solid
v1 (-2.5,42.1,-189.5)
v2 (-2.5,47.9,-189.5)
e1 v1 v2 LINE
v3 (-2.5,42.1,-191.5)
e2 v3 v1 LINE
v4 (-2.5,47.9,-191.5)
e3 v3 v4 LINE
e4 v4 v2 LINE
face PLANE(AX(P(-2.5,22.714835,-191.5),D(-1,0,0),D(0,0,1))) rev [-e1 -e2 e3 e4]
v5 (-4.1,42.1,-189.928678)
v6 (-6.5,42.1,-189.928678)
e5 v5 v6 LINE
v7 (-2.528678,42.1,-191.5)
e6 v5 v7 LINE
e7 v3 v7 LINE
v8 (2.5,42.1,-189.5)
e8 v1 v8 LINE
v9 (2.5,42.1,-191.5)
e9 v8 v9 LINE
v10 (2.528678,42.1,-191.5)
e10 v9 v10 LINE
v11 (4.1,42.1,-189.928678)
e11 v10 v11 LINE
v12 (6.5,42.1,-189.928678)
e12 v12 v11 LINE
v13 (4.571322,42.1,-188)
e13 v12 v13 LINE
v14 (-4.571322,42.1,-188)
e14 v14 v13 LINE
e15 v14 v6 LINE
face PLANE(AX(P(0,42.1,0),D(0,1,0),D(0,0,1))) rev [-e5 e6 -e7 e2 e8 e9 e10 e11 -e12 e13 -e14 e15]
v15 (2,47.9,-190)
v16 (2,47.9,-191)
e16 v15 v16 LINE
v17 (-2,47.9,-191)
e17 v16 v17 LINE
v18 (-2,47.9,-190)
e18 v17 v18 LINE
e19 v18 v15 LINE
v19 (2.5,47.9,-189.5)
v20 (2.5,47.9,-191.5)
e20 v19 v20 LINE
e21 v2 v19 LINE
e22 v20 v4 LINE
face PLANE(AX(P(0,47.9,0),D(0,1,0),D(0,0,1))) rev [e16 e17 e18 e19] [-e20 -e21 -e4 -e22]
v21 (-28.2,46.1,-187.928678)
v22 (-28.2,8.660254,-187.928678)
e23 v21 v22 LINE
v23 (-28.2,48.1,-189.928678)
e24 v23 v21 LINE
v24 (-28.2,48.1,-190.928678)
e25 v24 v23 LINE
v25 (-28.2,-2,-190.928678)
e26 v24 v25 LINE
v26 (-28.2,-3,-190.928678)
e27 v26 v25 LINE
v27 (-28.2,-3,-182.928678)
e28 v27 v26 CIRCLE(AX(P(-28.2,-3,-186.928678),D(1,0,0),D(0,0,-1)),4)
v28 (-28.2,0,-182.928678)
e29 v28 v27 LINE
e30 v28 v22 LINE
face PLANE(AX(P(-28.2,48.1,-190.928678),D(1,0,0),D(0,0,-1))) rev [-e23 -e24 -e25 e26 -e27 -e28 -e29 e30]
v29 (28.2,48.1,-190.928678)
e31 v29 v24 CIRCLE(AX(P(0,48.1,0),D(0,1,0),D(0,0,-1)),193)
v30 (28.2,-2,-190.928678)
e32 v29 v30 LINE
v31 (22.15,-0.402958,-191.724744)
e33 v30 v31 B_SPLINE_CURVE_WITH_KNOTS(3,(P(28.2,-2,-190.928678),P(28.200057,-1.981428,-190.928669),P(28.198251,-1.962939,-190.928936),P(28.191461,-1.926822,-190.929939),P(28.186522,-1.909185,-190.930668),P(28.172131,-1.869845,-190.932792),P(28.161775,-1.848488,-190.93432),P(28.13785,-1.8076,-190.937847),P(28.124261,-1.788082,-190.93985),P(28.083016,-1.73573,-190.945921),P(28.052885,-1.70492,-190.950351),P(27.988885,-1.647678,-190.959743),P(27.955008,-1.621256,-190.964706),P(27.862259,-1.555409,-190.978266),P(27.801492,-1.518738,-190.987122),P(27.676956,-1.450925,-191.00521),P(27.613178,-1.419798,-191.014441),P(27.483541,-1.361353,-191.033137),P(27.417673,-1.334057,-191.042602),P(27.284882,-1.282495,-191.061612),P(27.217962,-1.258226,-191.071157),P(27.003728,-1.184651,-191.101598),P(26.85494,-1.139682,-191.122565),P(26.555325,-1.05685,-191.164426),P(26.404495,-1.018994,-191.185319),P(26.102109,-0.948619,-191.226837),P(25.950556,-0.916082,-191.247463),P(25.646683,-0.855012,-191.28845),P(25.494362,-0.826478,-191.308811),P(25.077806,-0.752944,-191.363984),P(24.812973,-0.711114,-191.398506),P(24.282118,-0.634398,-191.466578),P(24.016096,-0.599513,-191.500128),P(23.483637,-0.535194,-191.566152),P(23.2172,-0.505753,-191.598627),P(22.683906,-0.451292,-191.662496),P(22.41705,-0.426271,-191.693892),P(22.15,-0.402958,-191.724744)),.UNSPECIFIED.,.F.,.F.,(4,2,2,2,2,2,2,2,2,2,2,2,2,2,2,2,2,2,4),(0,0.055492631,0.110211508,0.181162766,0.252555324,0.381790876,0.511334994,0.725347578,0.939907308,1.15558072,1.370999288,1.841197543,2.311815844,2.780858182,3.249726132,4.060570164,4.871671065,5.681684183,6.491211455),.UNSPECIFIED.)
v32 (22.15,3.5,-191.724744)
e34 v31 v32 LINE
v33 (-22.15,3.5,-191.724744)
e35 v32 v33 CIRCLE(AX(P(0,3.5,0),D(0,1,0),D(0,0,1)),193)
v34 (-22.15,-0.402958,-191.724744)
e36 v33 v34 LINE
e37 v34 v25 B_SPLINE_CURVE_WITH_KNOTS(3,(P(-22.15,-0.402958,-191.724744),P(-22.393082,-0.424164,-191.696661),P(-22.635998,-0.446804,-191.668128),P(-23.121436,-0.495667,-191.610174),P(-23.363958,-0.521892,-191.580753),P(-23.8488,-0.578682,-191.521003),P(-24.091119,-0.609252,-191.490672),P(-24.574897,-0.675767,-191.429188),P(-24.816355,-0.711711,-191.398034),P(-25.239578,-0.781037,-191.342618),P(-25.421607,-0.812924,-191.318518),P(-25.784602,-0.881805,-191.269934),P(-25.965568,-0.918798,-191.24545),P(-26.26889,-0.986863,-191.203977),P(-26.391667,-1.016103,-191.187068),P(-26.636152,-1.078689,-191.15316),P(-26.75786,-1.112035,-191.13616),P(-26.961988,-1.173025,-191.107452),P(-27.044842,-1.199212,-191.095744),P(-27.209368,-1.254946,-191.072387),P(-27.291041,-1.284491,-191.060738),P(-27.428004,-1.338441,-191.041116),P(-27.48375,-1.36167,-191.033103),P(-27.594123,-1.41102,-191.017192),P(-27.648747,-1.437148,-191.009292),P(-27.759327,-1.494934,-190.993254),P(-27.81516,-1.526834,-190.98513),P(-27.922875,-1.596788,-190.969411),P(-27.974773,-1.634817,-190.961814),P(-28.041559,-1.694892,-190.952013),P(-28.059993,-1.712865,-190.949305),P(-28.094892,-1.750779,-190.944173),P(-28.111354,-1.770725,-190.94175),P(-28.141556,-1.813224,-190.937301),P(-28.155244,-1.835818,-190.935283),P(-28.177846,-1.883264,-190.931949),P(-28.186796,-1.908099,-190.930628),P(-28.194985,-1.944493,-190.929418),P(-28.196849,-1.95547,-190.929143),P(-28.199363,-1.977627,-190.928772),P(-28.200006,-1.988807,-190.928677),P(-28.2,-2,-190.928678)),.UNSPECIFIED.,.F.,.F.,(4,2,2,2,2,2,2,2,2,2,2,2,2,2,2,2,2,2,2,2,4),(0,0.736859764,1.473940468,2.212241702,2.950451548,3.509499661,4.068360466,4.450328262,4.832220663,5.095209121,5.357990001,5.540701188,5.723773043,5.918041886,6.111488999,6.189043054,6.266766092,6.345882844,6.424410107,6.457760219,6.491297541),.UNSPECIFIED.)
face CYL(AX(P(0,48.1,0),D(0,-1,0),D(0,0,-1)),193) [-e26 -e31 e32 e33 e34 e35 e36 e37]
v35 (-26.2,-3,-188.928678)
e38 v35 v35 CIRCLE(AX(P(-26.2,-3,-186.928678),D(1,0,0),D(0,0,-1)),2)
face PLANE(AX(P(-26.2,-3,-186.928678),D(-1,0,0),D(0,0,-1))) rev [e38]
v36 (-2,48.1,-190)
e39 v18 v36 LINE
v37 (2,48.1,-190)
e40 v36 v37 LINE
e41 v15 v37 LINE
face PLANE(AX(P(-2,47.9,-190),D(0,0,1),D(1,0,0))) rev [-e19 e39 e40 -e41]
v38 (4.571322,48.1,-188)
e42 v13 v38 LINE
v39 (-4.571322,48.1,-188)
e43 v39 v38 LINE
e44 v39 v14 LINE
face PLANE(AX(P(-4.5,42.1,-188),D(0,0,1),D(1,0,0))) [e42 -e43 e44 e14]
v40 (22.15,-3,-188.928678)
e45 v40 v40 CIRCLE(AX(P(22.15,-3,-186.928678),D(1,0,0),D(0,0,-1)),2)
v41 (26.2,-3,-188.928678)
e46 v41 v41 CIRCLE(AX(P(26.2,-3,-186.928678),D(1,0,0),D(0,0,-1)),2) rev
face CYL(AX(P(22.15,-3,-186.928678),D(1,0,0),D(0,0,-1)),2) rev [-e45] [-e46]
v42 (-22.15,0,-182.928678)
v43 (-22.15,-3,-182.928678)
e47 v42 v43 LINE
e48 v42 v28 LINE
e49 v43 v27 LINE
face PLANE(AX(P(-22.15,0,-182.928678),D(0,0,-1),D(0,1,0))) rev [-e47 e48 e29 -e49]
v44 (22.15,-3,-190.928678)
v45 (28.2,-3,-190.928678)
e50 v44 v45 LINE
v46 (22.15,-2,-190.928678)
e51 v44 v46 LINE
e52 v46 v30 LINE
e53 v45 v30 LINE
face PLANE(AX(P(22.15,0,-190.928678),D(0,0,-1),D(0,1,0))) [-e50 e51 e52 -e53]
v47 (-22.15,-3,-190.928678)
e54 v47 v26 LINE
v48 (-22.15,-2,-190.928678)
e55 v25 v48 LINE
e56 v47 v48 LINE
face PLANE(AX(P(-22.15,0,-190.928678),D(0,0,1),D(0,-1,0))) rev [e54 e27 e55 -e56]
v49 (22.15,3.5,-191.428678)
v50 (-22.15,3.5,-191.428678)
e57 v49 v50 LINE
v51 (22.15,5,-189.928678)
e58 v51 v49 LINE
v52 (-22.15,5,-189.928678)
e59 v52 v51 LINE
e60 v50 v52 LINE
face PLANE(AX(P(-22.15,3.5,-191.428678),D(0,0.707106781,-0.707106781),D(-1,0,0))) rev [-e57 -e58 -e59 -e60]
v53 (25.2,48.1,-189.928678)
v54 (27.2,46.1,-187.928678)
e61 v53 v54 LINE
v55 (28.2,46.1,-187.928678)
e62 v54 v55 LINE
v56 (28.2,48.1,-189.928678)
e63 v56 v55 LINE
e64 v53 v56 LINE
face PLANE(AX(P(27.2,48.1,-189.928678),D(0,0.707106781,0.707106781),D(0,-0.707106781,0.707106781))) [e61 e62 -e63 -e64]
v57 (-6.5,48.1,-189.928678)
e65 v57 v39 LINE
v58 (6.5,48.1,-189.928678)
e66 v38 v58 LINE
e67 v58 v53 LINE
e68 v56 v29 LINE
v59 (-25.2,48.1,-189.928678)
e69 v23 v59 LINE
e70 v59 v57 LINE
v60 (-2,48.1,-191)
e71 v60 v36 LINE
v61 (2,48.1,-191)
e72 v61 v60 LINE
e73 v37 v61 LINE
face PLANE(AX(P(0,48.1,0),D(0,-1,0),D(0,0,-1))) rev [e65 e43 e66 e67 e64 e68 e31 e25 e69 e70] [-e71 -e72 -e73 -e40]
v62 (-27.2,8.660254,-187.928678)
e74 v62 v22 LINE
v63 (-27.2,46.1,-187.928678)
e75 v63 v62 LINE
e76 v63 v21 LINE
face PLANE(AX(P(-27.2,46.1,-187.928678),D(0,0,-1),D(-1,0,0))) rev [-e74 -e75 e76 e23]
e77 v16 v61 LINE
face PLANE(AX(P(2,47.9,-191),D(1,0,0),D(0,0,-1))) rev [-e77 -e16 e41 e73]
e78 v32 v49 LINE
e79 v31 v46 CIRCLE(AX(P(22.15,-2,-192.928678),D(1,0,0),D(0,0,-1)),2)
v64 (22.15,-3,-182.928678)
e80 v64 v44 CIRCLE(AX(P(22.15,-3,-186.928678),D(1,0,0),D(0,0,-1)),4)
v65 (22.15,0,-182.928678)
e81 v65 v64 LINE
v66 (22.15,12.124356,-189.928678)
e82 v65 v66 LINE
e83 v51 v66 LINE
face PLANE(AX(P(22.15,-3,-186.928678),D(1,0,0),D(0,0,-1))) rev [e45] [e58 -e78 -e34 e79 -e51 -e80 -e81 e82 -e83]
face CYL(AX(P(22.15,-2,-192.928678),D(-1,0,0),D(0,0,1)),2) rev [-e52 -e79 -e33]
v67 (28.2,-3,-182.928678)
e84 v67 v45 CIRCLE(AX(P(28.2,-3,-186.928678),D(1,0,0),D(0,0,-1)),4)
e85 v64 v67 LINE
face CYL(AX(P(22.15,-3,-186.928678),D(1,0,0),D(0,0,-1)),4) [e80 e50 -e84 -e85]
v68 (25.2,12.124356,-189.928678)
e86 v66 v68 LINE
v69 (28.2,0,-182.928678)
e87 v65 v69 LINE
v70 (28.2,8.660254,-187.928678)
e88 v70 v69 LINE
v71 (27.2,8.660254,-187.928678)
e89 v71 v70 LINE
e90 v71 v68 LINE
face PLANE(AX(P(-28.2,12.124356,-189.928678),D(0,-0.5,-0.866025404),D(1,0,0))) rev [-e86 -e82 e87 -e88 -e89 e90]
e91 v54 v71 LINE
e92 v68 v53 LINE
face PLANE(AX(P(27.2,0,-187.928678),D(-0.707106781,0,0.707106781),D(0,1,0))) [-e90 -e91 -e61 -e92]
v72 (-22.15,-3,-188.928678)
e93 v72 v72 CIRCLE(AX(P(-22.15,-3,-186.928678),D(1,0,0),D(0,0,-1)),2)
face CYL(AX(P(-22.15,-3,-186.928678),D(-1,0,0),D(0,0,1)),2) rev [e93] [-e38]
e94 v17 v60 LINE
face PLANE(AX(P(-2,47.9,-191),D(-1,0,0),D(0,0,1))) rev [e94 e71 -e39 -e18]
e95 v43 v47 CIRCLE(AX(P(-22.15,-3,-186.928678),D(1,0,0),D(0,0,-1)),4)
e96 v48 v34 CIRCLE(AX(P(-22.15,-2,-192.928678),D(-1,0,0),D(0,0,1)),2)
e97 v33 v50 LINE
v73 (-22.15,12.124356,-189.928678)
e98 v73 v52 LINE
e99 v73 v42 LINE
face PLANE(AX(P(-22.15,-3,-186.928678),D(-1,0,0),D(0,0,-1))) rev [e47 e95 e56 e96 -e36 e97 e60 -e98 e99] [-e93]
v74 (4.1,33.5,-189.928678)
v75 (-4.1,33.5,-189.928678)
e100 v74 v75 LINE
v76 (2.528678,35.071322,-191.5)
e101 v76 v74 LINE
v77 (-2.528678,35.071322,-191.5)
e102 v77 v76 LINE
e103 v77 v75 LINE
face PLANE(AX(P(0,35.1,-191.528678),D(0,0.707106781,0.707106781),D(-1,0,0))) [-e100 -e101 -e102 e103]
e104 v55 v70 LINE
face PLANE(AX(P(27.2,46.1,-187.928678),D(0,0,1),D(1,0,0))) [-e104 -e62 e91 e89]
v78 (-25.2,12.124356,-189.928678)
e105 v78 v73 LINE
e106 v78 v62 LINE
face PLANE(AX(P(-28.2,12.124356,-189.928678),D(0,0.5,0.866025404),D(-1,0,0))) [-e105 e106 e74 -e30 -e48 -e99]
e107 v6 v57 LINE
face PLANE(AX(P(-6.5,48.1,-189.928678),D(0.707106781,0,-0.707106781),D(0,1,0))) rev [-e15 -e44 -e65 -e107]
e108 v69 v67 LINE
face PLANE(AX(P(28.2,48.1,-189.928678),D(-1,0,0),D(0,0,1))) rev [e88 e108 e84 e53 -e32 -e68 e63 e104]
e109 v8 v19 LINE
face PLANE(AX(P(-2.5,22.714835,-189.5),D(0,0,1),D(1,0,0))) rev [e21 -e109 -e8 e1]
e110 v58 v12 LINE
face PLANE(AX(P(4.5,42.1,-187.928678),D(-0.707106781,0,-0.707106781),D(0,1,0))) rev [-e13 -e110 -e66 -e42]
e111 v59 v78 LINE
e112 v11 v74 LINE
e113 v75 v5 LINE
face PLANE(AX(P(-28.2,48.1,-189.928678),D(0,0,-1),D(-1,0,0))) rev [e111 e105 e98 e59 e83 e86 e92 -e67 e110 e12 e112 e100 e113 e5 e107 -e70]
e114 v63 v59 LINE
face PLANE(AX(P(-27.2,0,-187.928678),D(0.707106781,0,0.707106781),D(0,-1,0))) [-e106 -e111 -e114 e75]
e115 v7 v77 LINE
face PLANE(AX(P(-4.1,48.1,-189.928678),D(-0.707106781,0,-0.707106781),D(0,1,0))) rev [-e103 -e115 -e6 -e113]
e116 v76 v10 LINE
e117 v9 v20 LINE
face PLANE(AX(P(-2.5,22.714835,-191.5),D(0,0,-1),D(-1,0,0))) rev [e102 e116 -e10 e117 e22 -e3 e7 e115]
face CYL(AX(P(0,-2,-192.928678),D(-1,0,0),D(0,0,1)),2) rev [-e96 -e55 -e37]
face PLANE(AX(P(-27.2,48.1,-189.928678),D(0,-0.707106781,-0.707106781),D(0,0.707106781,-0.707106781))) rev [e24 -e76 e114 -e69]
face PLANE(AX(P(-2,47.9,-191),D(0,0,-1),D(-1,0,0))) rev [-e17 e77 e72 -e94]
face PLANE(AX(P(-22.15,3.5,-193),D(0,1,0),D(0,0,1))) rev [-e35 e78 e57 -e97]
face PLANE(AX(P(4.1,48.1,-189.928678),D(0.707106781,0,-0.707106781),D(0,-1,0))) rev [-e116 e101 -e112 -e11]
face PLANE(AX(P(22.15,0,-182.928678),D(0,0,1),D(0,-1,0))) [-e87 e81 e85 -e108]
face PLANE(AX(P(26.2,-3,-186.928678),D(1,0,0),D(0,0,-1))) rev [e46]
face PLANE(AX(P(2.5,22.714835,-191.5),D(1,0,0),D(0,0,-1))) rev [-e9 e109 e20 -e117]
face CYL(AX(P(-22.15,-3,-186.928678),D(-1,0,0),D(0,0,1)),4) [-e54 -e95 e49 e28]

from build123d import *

# Parameters (mm, degrees)
BOSS_EXTRUDE1_DEPTH       = 48.1
SKETCH2_R                 = 2
BOSS_EXTRUDE2_DEPTH       = 6.05
CHAMFER1_SIZE2            = 7
CHAMFER1_SIZE             = 12.124355653
CHAMFER1_OF_MIRROR1_SIZE2 = 7
CHAMFER1_OF_MIRROR1_SIZE  = 12.124355653
BOSS_EXTRUDE3_DEPTH       = 1
CHAMFER2_SIZE             = 2
SKETCH4_W                 = 44.3
SKETCH4_H                 = 3.5
LITTLE_BIT_OF_SPACE_DEPTH = 57.194750645
CHAMFER3_SIZE             = 1.5
FILLET1_R                 = 2
SKETCH5_W                 = 9
SKETCH5_H                 = 1.928677783
BOSS_EXTRUDE4_DEPTH       = 6
SKETCH6_W                 = 5
SKETCH6_H                 = 2
CUT_EXTRUDE2_DEPTH        = 13
SKETCH7_W                 = 5
SKETCH7_H                 = 2
SKETCH7_W_2               = 4
SKETCH7_H_2               = 1
BOSS_EXTRUDE5_DEPTH       = 0.2
BOSS_EXTRUDE7_DEPTH       = 1.5
CHAMFER6_SIZE             = 1.5
CHAMFER7_SIZE             = 1.6
CHAMFER8_SIZE             = 2
SKETCH10_W                = 15.27160506
SKETCH10_H                = 9.874411304
CUT_EXTRUDE3_DEPTH        = 203.6826338
SKETCH11_R                = 2
BOSS_EXTRUDE8_DEPTH       = 2


# Read off the part's stored shape, not the designer's step: Boss-Extrude1
# Some blends are built 0.0001 mm under size
with BuildPart() as part:
    # Boss-Extrude1 outline → Boss-Extrude1 (new body)
    with BuildSketch(Plane(origin=(0, 0, 0), x_dir=(1, 0, 0), z_dir=(0, 1, 0))):
        with BuildLine():
            ThreePointArc((28.2, 190.928677783), (0, 193), (-28.2, 190.928677783))
            Line((-28.2, 190.928677783), (-28.2, 189.928677783))
            Line((-28.2, 189.928677783), (28.2, 189.928677783))
            Line((28.2, 189.928677783), (28.2, 190.928677783))
        make_face()
    extrude(amount=BOSS_EXTRUDE1_DEPTH)

    # Sketch2 → Boss-Extrude2 (add)
    with BuildSketch(Plane(origin=(28.2, 0, 0), x_dir=(0, 0, -1), z_dir=(1, 0, 0))):
        with BuildLine():
            Line((190.928677783, 0), (182.928677783, 0))
            Line((182.928677783, 0), (182.928677783, -3))
            ThreePointArc((182.928677783, -3), (186.928677783, -7), (190.928677783, -3))
            Line((190.928677783, -3), (190.928677783, 0))
        make_face()
        with Locations((186.928677783, -3)):
            Circle(SKETCH2_R, mode=Mode.SUBTRACT)
    boss_extrude2 = extrude(amount=-BOSS_EXTRUDE2_DEPTH)

    # Chamfer1
    chamfer1_edges = [part.edges().sort_by_distance(p)[0] for p in [
        (25.175, 0, -189.928677783),
    ]]
    chamfer1_side = [part.faces().sort_by_distance(p)[0] for p in [
        (25.175, 0.14, -189.928677783),
    ]]
    chamfer(chamfer1_edges, length=CHAMFER1_SIZE - 0.0001, length2=CHAMFER1_SIZE2 - 0.0001, reference=chamfer1_side[0])  # a hair under: the kernel refuses the full size

    # Mirror1: Boss-Extrude2 across plane
    add(boss_extrude2.mirror(Plane(origin=(0, 0, 0), x_dir=(0, 0, 1), z_dir=(1, 0, 0))))

    # Chamfer1 of Mirror1
    chamfer1_of_mirror1_edges = [part.edges().sort_by_distance(p)[0] for p in [
        (-25.175, 0, -189.928677783),
    ]]
    chamfer1_of_mirror1_side = [part.faces().sort_by_distance(p)[0] for p in [
        (-25.175, 0.14, -189.928677783),
    ]]
    chamfer(chamfer1_of_mirror1_edges, length=CHAMFER1_OF_MIRROR1_SIZE - 0.0001, length2=CHAMFER1_OF_MIRROR1_SIZE2 - 0.0001, reference=chamfer1_of_mirror1_side[0])  # a hair under: the kernel refuses the full size

    # Sketch3 → Boss-Extrude3 (add)
    with BuildSketch(Plane(origin=(28.2, 0, 0), x_dir=(0, 0, -1), z_dir=(1, 0, 0))):
        Polygon((190.928677783, 48.1), (190.928677783, 8.660254038), (187.928677783, 8.660254038), (187.928677783, 46.1), (189.928677783, 48.1), align=None)
    boss_extrude3 = extrude(amount=-BOSS_EXTRUDE3_DEPTH)

    # Mirror2: Boss-Extrude3 across plane
    add(boss_extrude3.mirror(Plane(origin=(0, 0, 0), x_dir=(0, 0, 1), z_dir=(1, 0, 0))))

    # Chamfer2
    chamfer2_edges = [part.edges().sort_by_distance(p)[0] for p in [
        (-27.2, 30.112127827, -189.928677783),
        (27.2, 30.112127827, -189.928677783),
    ]]
    chamfer(chamfer2_edges, length=CHAMFER2_SIZE - 0.0001)  # a hair under: the kernel refuses the full size

    # Sketch4 → Little bit of space (cut, through all)
    with BuildSketch(Plane.XY.offset(-189.928677783)):
        with Locations((0, 1.75)):
            Rectangle(SKETCH4_W, SKETCH4_H)
    extrude(amount=-LITTLE_BIT_OF_SPACE_DEPTH, mode=Mode.SUBTRACT)

    # Chamfer3
    chamfer3_edges = [part.edges().sort_by_distance(p)[0] for p in [
        (0, 3.5, -189.928677783),
    ]]
    chamfer(chamfer3_edges, length=CHAMFER3_SIZE)

    # Fillet1
    # the kernel refuses this fillet: 2 mm, written as the material it adds along each edge
    with BuildSketch(Plane(origin=(-33.2, 0, -190.928677783), x_dir=(0, 0, -1), z_dir=(1, 0, 0))) as fillet1_piece_1_section:
        with BuildLine():
            CenterArc((FILLET1_R, -FILLET1_R), FILLET1_R, 90, 90)
            Line((0, -FILLET1_R), (0, 0))
            Line((0, 0), (FILLET1_R, 0))
        make_face()
    fillet1_piece_1 = extrude(amount=11.05, mode=Mode.PRIVATE)
    fillet1_piece_1 = fillet1_piece_1 & Plane(origin=(0, -0.599281995, -9e-09), x_dir=(0.14611398964376573, 0, -0.9892677605332044), z_dir=(0, -1, 0)) * Cylinder(192.999999991, 31, mode=Mode.PRIVATE)
    add(fillet1_piece_1)
    with BuildSketch(Plane(origin=(33.2, 0, -190.928677783), x_dir=(0, 0, -1), z_dir=(-1, 0, 0))) as fillet1_piece_2_section:
        with BuildLine():
            CenterArc((FILLET1_R, FILLET1_R), FILLET1_R, 180, 90)
            Line((0, FILLET1_R), (0, 0))
            Line((0, 0), (FILLET1_R, 0))
        make_face()
    fillet1_piece_2 = extrude(amount=11.05, mode=Mode.PRIVATE)
    fillet1_piece_2 = fillet1_piece_2 & Plane(origin=(0, -0.599283958, -9e-09), x_dir=(0.14611398964376573, 0, -0.9892677605332044), z_dir=(0, -1, 0)) * Cylinder(192.999999991, 31, mode=Mode.PRIVATE)
    add(fillet1_piece_2)

    # Sketch5 → Boss-Extrude4 (add)
    with BuildSketch(Plane(origin=(0, 48.1, 0), x_dir=(1, 0, 0), z_dir=(0, 1, 0))):
        with Locations((0, 188.964338892)):
            Rectangle(SKETCH5_W, SKETCH5_H)
    extrude(amount=-BOSS_EXTRUDE4_DEPTH)

    # Sketch6 → Cut-Extrude2 (cut)
    with BuildSketch(Plane(origin=(0, 48.1, 0), x_dir=(1, 0, 0), z_dir=(0, 1, 0))):
        with Locations((0, 190.5)):
            Rectangle(SKETCH6_W, SKETCH6_H)
    extrude(amount=-CUT_EXTRUDE2_DEPTH, mode=Mode.SUBTRACT)

    # Sketch7 → Boss-Extrude5 (add)
    with BuildSketch(Plane(origin=(0, 48.1, 0), x_dir=(1, 0, 0), z_dir=(0, 1, 0))):
        with Locations((0, 190.5)):
            Rectangle(SKETCH7_W, SKETCH7_H)
        with Locations((0, 190.5)):
            Rectangle(SKETCH7_W_2, SKETCH7_H_2, mode=Mode.SUBTRACT)
    extrude(amount=-BOSS_EXTRUDE5_DEPTH)

    # Sketch9 → Boss-Extrude7 (add)
    with BuildSketch(Plane(origin=(0, 48.1, 0), x_dir=(1, 0, 0), z_dir=(0, 1, 0))):
        with BuildLine():
            Line((-2.5, 192.983807611), (-2.5, 191.383807611))
            Line((-2.5, 191.383807611), (2.5, 191.383807611))
            Line((2.5, 191.383807611), (2.5, 192.983807611))
            ThreePointArc((2.5, 192.983807611), (0, 193), (-2.5, 192.983807611))
        make_face()
    extrude(amount=BOSS_EXTRUDE7_DEPTH)

    # Chamfer6
    # the kernel refuses this chamfer: 1.5 mm, written as the material it adds along each edge
    with BuildSketch(Plane(origin=(-2.5, 48.1, -196.841332093), x_dir=(-0.9996219169112968, -0.02749587661058678, 0), z_dir=(0, 0, 1))) as chamfer6_piece_1_section:
        Polygon((CHAMFER6_SIZE * 0.999621916911, -CHAMFER6_SIZE * 0.0274958766106), (-CHAMFER6_SIZE * 0.0274958766106, -CHAMFER6_SIZE * 0.999621916911), (0, 0), align=None)
    chamfer6_piece_1 = extrude(amount=5.457524482, mode=Mode.PRIVATE)
    chamfer6_piece_1 = chamfer6_piece_1 & Plane(origin=(0, 48.593713067, -9e-09), x_dir=(0.14611398964402453, 0, -0.9892677605331662), z_dir=(0, -1, 0)) * Cylinder(192.999999991, 17, mode=Mode.PRIVATE)
    chamfer6_piece_1 = split(chamfer6_piece_1, bisect_by=Plane(origin=(-2.994165451, 49.6, -192.180106011), z_dir=(0, -1, 0)), keep=Keep.TOP, mode=Mode.PRIVATE)
    add(chamfer6_piece_1)
    with BuildSketch(Plane(origin=(2.5, 48.1, -191.383807611), x_dir=(0.9996219169112968, -0.02749587661058678, 0), z_dir=(0, 0, -1))) as chamfer6_piece_2_section:
        Polygon((CHAMFER6_SIZE * 0.999621916911, -CHAMFER6_SIZE * 0.0274958766106), (-CHAMFER6_SIZE * 0.0274958766106, -CHAMFER6_SIZE * 0.999621916911), (0, 0), align=None)
    chamfer6_piece_2 = extrude(amount=5.457524482, mode=Mode.PRIVATE)
    chamfer6_piece_2 = chamfer6_piece_2 & Plane(origin=(0, 48.593713067, -9e-09), x_dir=(0.14611398964402453, 0, -0.9892677605331662), z_dir=(0, -1, 0)) * Cylinder(192.999999991, 17, mode=Mode.PRIVATE)
    chamfer6_piece_2 = split(chamfer6_piece_2, bisect_by=Plane(origin=(2.994165451, 49.6, -192.180106011), z_dir=(0, -1, 0)), keep=Keep.TOP, mode=Mode.PRIVATE)
    add(chamfer6_piece_2)

    # Chamfer7
    # the kernel refuses this chamfer: 1.6 mm, written as the material it takes off along each edge
    with BuildSketch(Plane(origin=(-2.5, 42.1, -189.928677783), x_dir=(0.027495876610586577, 0, -0.9996219169112966), z_dir=(0, -1, 0))) as chamfer7_piece_1_section:
        Polygon((CHAMFER7_SIZE * 0.999621916911, -CHAMFER7_SIZE * 0.0274958766106), (-CHAMFER7_SIZE * 0.0274958766106, -CHAMFER7_SIZE * 0.999621916911), (0, 0), align=None)
    chamfer7_piece_1 = extrude(amount=7, mode=Mode.PRIVATE)
    chamfer7_piece_1 = split(chamfer7_piece_1, bisect_by=Plane(origin=(-3.029634844, 38.6, -191.5), z_dir=(0, 0, 1)), keep=Keep.TOP, mode=Mode.PRIVATE)
    add(chamfer7_piece_1, mode=Mode.SUBTRACT)
    with BuildSketch(Plane(origin=(2.5, 35.1, -189.928677783), x_dir=(-0.027495876610586306, 0, -0.9996219169112966), z_dir=(0, 1, 0))) as chamfer7_piece_2_section:
        Polygon((CHAMFER7_SIZE * 0.999621916911, -CHAMFER7_SIZE * 0.0274958766106), (-CHAMFER7_SIZE * 0.0274958766106, -CHAMFER7_SIZE * 0.999621916911), (0, 0), align=None)
    chamfer7_piece_2 = extrude(amount=7, mode=Mode.PRIVATE)
    chamfer7_piece_2 = split(chamfer7_piece_2, bisect_by=Plane(origin=(3.029634844, 38.6, -191.5), z_dir=(0, 0, 1)), keep=Keep.TOP, mode=Mode.PRIVATE)
    add(chamfer7_piece_2, mode=Mode.SUBTRACT)
    with BuildSketch(Plane(origin=(2.5, 35.1, -189.928677783), x_dir=(0, 0.027495876610587656, -0.9996219169112966), z_dir=(-1, 0, 0))) as chamfer7_piece_3_section:
        Polygon((CHAMFER7_SIZE * 0.999621916911, CHAMFER7_SIZE * 0.0274958766106), (-CHAMFER7_SIZE * 0.0274958766106, CHAMFER7_SIZE * 0.999621916911), (0, 0), align=None)
    chamfer7_piece_3 = extrude(amount=5, mode=Mode.PRIVATE)
    chamfer7_piece_3 = split(chamfer7_piece_3, bisect_by=Plane(origin=(0, 34.570365156, -191.5), z_dir=(0, 0, 1)), keep=Keep.TOP, mode=Mode.PRIVATE)
    add(chamfer7_piece_3, mode=Mode.SUBTRACT)
    with BuildSketch(Plane(origin=(-2.5, 42.1, -189.928677783), x_dir=(0.027495876610586577, 0, -0.9996219169112966), z_dir=(0, -1, 0))) as chamfer7_piece_4a_section:
        Polygon((CHAMFER7_SIZE * 0.999621916911, -CHAMFER7_SIZE * 0.0274958766106), (-CHAMFER7_SIZE * 0.0274958766106, -CHAMFER7_SIZE * 0.999621916911), (0, 0), align=None)
    chamfer7_piece_4a = extrude(amount=11.114692781, mode=Mode.PRIVATE)
    chamfer7_piece_4a = split(chamfer7_piece_4a, bisect_by=Plane(origin=(-3.029634844, 33.04265361, -191.5), z_dir=(0, 0, 1)), keep=Keep.TOP, mode=Mode.PRIVATE)
    chamfer7_piece_4a = split(chamfer7_piece_4a, bisect_by=Plane(origin=(-3.029634844, 35.1, -190.452614737), z_dir=(0, -1, 0)), keep=Keep.TOP, mode=Mode.PRIVATE)
    with BuildSketch(Plane(origin=(2.5, 35.1, -189.928677783), x_dir=(0, 0.027495876610587656, -0.9996219169112966), z_dir=(-1, 0, 0))) as chamfer7_piece_4b_section:
        Polygon((CHAMFER7_SIZE * 0.999621916911, CHAMFER7_SIZE * 0.0274958766106), (-CHAMFER7_SIZE * 0.0274958766106, CHAMFER7_SIZE * 0.999621916911), (0, 0), align=None)
    chamfer7_piece_4b = extrude(amount=9.114692781, mode=Mode.PRIVATE)
    chamfer7_piece_4b = split(chamfer7_piece_4b, bisect_by=Plane(origin=(-2.5, 34.570365156, -190.452614737), z_dir=(-1, 0, 0)), keep=Keep.TOP, mode=Mode.PRIVATE)
    chamfer7_piece_4b = split(chamfer7_piece_4b, bisect_by=Plane(origin=(-4.55734639, 34.570365156, -191.5), z_dir=(0, 0, 1)), keep=Keep.TOP, mode=Mode.PRIVATE)
    chamfer7_piece_4 = chamfer7_piece_4a & chamfer7_piece_4b
    add(chamfer7_piece_4, mode=Mode.SUBTRACT)
    with BuildSketch(Plane(origin=(6.614692781, 35.1, -189.928677783), x_dir=(0, 0.027495876610587656, -0.9996219169112966), z_dir=(-1, 0, 0))) as chamfer7_piece_5a_section:
        Polygon((CHAMFER7_SIZE * 0.999621916911, CHAMFER7_SIZE * 0.0274958766106), (-CHAMFER7_SIZE * 0.0274958766106, CHAMFER7_SIZE * 0.999621916911), (0, 0), align=None)
    chamfer7_piece_5a = extrude(amount=9.114692781, mode=Mode.PRIVATE)
    chamfer7_piece_5a = split(chamfer7_piece_5a, bisect_by=Plane(origin=(2.5, 34.570365156, -190.452614737), z_dir=(1, 0, 0)), keep=Keep.TOP, mode=Mode.PRIVATE)
    chamfer7_piece_5a = split(chamfer7_piece_5a, bisect_by=Plane(origin=(4.55734639, 34.570365156, -191.5), z_dir=(0, 0, 1)), keep=Keep.TOP, mode=Mode.PRIVATE)
    with BuildSketch(Plane(origin=(2.5, 30.985307219, -189.928677783), x_dir=(-0.027495876610586577, 0, -0.9996219169112966), z_dir=(0, 1, 0))) as chamfer7_piece_5b_section:
        Polygon((CHAMFER7_SIZE * 0.999621916911, -CHAMFER7_SIZE * 0.0274958766106), (-CHAMFER7_SIZE * 0.0274958766106, -CHAMFER7_SIZE * 0.999621916911), (0, 0), align=None)
    chamfer7_piece_5b = extrude(amount=11.114692781, mode=Mode.PRIVATE)
    chamfer7_piece_5b = split(chamfer7_piece_5b, bisect_by=Plane(origin=(3.029634844, 35.1, -190.452614737), z_dir=(0, -1, 0)), keep=Keep.TOP, mode=Mode.PRIVATE)
    chamfer7_piece_5b = split(chamfer7_piece_5b, bisect_by=Plane(origin=(3.029634844, 33.04265361, -191.5), z_dir=(0, 0, 1)), keep=Keep.TOP, mode=Mode.PRIVATE)
    chamfer7_piece_5 = chamfer7_piece_5a & chamfer7_piece_5b
    add(chamfer7_piece_5, mode=Mode.SUBTRACT)

    # Chamfer8
    # the kernel refuses this chamfer: 2 mm, written as the material it adds along each edge
    with BuildSketch(Plane(origin=(-4.5, 48.1, -189.928677783), x_dir=(-0.9996219169125519, 0, -0.027495876564955297), z_dir=(0, -1, 0))) as chamfer8_piece_1_section:
        Polygon((CHAMFER8_SIZE * 0.999621916911, -CHAMFER8_SIZE * 0.0274958766112), (-CHAMFER8_SIZE * 0.027495876565, -CHAMFER8_SIZE * 0.999621916913), (0, 0), align=None)
    chamfer8_piece_1 = extrude(amount=6, mode=Mode.PRIVATE)
    chamfer8_piece_1 = split(chamfer8_piece_1, bisect_by=Plane(origin=(-5.163599307, 45.1, -188), z_dir=(0, 0, -1)), keep=Keep.TOP, mode=Mode.PRIVATE)
    add(chamfer8_piece_1)
    with BuildSketch(Plane(origin=(4.5, 48.1, -189.928677783), x_dir=(0.9996219169125516, 0, -0.02749587656495524), z_dir=(0, -1, 0))) as chamfer8_piece_2_section:
        Polygon((CHAMFER8_SIZE * 0.999621916911, CHAMFER8_SIZE * 0.0274958766112), (-CHAMFER8_SIZE * 0.027495876565, CHAMFER8_SIZE * 0.999621916913), (0, 0), align=None)
    chamfer8_piece_2 = extrude(amount=6, mode=Mode.PRIVATE)
    chamfer8_piece_2 = split(chamfer8_piece_2, bisect_by=Plane(origin=(5.163599307, 45.1, -188), z_dir=(0, 0, -1)), keep=Keep.TOP, mode=Mode.PRIVATE)
    add(chamfer8_piece_2)

    # Sketch10 → Cut-Extrude3 (cut, through all)
    with BuildSketch(Plane(origin=(0, 48.1, 0), x_dir=(1, 0, 0), z_dir=(0, 1, 0))):
        with Locations((-0.319497541, 192.732882239)):
            Rectangle(SKETCH10_W, SKETCH10_H)
    extrude(amount=CUT_EXTRUDE3_DEPTH, mode=Mode.SUBTRACT)

    # Sketch11 → Boss-Extrude8 (add)
    with BuildSketch(Plane(origin=(28.2, 0, 0), x_dir=(0, 0, -1), z_dir=(1, 0, 0))):
        with Locations((186.928677783, -3)):
            Circle(SKETCH11_R)
    boss_extrude8 = extrude(amount=-BOSS_EXTRUDE8_DEPTH)

    # Mirror3: Boss-Extrude8 across plane
    add(boss_extrude8.mirror(Plane(origin=(0, 0, 0), x_dir=(0, 0, 1), z_dir=(1, 0, 0))))


solid = part.part
